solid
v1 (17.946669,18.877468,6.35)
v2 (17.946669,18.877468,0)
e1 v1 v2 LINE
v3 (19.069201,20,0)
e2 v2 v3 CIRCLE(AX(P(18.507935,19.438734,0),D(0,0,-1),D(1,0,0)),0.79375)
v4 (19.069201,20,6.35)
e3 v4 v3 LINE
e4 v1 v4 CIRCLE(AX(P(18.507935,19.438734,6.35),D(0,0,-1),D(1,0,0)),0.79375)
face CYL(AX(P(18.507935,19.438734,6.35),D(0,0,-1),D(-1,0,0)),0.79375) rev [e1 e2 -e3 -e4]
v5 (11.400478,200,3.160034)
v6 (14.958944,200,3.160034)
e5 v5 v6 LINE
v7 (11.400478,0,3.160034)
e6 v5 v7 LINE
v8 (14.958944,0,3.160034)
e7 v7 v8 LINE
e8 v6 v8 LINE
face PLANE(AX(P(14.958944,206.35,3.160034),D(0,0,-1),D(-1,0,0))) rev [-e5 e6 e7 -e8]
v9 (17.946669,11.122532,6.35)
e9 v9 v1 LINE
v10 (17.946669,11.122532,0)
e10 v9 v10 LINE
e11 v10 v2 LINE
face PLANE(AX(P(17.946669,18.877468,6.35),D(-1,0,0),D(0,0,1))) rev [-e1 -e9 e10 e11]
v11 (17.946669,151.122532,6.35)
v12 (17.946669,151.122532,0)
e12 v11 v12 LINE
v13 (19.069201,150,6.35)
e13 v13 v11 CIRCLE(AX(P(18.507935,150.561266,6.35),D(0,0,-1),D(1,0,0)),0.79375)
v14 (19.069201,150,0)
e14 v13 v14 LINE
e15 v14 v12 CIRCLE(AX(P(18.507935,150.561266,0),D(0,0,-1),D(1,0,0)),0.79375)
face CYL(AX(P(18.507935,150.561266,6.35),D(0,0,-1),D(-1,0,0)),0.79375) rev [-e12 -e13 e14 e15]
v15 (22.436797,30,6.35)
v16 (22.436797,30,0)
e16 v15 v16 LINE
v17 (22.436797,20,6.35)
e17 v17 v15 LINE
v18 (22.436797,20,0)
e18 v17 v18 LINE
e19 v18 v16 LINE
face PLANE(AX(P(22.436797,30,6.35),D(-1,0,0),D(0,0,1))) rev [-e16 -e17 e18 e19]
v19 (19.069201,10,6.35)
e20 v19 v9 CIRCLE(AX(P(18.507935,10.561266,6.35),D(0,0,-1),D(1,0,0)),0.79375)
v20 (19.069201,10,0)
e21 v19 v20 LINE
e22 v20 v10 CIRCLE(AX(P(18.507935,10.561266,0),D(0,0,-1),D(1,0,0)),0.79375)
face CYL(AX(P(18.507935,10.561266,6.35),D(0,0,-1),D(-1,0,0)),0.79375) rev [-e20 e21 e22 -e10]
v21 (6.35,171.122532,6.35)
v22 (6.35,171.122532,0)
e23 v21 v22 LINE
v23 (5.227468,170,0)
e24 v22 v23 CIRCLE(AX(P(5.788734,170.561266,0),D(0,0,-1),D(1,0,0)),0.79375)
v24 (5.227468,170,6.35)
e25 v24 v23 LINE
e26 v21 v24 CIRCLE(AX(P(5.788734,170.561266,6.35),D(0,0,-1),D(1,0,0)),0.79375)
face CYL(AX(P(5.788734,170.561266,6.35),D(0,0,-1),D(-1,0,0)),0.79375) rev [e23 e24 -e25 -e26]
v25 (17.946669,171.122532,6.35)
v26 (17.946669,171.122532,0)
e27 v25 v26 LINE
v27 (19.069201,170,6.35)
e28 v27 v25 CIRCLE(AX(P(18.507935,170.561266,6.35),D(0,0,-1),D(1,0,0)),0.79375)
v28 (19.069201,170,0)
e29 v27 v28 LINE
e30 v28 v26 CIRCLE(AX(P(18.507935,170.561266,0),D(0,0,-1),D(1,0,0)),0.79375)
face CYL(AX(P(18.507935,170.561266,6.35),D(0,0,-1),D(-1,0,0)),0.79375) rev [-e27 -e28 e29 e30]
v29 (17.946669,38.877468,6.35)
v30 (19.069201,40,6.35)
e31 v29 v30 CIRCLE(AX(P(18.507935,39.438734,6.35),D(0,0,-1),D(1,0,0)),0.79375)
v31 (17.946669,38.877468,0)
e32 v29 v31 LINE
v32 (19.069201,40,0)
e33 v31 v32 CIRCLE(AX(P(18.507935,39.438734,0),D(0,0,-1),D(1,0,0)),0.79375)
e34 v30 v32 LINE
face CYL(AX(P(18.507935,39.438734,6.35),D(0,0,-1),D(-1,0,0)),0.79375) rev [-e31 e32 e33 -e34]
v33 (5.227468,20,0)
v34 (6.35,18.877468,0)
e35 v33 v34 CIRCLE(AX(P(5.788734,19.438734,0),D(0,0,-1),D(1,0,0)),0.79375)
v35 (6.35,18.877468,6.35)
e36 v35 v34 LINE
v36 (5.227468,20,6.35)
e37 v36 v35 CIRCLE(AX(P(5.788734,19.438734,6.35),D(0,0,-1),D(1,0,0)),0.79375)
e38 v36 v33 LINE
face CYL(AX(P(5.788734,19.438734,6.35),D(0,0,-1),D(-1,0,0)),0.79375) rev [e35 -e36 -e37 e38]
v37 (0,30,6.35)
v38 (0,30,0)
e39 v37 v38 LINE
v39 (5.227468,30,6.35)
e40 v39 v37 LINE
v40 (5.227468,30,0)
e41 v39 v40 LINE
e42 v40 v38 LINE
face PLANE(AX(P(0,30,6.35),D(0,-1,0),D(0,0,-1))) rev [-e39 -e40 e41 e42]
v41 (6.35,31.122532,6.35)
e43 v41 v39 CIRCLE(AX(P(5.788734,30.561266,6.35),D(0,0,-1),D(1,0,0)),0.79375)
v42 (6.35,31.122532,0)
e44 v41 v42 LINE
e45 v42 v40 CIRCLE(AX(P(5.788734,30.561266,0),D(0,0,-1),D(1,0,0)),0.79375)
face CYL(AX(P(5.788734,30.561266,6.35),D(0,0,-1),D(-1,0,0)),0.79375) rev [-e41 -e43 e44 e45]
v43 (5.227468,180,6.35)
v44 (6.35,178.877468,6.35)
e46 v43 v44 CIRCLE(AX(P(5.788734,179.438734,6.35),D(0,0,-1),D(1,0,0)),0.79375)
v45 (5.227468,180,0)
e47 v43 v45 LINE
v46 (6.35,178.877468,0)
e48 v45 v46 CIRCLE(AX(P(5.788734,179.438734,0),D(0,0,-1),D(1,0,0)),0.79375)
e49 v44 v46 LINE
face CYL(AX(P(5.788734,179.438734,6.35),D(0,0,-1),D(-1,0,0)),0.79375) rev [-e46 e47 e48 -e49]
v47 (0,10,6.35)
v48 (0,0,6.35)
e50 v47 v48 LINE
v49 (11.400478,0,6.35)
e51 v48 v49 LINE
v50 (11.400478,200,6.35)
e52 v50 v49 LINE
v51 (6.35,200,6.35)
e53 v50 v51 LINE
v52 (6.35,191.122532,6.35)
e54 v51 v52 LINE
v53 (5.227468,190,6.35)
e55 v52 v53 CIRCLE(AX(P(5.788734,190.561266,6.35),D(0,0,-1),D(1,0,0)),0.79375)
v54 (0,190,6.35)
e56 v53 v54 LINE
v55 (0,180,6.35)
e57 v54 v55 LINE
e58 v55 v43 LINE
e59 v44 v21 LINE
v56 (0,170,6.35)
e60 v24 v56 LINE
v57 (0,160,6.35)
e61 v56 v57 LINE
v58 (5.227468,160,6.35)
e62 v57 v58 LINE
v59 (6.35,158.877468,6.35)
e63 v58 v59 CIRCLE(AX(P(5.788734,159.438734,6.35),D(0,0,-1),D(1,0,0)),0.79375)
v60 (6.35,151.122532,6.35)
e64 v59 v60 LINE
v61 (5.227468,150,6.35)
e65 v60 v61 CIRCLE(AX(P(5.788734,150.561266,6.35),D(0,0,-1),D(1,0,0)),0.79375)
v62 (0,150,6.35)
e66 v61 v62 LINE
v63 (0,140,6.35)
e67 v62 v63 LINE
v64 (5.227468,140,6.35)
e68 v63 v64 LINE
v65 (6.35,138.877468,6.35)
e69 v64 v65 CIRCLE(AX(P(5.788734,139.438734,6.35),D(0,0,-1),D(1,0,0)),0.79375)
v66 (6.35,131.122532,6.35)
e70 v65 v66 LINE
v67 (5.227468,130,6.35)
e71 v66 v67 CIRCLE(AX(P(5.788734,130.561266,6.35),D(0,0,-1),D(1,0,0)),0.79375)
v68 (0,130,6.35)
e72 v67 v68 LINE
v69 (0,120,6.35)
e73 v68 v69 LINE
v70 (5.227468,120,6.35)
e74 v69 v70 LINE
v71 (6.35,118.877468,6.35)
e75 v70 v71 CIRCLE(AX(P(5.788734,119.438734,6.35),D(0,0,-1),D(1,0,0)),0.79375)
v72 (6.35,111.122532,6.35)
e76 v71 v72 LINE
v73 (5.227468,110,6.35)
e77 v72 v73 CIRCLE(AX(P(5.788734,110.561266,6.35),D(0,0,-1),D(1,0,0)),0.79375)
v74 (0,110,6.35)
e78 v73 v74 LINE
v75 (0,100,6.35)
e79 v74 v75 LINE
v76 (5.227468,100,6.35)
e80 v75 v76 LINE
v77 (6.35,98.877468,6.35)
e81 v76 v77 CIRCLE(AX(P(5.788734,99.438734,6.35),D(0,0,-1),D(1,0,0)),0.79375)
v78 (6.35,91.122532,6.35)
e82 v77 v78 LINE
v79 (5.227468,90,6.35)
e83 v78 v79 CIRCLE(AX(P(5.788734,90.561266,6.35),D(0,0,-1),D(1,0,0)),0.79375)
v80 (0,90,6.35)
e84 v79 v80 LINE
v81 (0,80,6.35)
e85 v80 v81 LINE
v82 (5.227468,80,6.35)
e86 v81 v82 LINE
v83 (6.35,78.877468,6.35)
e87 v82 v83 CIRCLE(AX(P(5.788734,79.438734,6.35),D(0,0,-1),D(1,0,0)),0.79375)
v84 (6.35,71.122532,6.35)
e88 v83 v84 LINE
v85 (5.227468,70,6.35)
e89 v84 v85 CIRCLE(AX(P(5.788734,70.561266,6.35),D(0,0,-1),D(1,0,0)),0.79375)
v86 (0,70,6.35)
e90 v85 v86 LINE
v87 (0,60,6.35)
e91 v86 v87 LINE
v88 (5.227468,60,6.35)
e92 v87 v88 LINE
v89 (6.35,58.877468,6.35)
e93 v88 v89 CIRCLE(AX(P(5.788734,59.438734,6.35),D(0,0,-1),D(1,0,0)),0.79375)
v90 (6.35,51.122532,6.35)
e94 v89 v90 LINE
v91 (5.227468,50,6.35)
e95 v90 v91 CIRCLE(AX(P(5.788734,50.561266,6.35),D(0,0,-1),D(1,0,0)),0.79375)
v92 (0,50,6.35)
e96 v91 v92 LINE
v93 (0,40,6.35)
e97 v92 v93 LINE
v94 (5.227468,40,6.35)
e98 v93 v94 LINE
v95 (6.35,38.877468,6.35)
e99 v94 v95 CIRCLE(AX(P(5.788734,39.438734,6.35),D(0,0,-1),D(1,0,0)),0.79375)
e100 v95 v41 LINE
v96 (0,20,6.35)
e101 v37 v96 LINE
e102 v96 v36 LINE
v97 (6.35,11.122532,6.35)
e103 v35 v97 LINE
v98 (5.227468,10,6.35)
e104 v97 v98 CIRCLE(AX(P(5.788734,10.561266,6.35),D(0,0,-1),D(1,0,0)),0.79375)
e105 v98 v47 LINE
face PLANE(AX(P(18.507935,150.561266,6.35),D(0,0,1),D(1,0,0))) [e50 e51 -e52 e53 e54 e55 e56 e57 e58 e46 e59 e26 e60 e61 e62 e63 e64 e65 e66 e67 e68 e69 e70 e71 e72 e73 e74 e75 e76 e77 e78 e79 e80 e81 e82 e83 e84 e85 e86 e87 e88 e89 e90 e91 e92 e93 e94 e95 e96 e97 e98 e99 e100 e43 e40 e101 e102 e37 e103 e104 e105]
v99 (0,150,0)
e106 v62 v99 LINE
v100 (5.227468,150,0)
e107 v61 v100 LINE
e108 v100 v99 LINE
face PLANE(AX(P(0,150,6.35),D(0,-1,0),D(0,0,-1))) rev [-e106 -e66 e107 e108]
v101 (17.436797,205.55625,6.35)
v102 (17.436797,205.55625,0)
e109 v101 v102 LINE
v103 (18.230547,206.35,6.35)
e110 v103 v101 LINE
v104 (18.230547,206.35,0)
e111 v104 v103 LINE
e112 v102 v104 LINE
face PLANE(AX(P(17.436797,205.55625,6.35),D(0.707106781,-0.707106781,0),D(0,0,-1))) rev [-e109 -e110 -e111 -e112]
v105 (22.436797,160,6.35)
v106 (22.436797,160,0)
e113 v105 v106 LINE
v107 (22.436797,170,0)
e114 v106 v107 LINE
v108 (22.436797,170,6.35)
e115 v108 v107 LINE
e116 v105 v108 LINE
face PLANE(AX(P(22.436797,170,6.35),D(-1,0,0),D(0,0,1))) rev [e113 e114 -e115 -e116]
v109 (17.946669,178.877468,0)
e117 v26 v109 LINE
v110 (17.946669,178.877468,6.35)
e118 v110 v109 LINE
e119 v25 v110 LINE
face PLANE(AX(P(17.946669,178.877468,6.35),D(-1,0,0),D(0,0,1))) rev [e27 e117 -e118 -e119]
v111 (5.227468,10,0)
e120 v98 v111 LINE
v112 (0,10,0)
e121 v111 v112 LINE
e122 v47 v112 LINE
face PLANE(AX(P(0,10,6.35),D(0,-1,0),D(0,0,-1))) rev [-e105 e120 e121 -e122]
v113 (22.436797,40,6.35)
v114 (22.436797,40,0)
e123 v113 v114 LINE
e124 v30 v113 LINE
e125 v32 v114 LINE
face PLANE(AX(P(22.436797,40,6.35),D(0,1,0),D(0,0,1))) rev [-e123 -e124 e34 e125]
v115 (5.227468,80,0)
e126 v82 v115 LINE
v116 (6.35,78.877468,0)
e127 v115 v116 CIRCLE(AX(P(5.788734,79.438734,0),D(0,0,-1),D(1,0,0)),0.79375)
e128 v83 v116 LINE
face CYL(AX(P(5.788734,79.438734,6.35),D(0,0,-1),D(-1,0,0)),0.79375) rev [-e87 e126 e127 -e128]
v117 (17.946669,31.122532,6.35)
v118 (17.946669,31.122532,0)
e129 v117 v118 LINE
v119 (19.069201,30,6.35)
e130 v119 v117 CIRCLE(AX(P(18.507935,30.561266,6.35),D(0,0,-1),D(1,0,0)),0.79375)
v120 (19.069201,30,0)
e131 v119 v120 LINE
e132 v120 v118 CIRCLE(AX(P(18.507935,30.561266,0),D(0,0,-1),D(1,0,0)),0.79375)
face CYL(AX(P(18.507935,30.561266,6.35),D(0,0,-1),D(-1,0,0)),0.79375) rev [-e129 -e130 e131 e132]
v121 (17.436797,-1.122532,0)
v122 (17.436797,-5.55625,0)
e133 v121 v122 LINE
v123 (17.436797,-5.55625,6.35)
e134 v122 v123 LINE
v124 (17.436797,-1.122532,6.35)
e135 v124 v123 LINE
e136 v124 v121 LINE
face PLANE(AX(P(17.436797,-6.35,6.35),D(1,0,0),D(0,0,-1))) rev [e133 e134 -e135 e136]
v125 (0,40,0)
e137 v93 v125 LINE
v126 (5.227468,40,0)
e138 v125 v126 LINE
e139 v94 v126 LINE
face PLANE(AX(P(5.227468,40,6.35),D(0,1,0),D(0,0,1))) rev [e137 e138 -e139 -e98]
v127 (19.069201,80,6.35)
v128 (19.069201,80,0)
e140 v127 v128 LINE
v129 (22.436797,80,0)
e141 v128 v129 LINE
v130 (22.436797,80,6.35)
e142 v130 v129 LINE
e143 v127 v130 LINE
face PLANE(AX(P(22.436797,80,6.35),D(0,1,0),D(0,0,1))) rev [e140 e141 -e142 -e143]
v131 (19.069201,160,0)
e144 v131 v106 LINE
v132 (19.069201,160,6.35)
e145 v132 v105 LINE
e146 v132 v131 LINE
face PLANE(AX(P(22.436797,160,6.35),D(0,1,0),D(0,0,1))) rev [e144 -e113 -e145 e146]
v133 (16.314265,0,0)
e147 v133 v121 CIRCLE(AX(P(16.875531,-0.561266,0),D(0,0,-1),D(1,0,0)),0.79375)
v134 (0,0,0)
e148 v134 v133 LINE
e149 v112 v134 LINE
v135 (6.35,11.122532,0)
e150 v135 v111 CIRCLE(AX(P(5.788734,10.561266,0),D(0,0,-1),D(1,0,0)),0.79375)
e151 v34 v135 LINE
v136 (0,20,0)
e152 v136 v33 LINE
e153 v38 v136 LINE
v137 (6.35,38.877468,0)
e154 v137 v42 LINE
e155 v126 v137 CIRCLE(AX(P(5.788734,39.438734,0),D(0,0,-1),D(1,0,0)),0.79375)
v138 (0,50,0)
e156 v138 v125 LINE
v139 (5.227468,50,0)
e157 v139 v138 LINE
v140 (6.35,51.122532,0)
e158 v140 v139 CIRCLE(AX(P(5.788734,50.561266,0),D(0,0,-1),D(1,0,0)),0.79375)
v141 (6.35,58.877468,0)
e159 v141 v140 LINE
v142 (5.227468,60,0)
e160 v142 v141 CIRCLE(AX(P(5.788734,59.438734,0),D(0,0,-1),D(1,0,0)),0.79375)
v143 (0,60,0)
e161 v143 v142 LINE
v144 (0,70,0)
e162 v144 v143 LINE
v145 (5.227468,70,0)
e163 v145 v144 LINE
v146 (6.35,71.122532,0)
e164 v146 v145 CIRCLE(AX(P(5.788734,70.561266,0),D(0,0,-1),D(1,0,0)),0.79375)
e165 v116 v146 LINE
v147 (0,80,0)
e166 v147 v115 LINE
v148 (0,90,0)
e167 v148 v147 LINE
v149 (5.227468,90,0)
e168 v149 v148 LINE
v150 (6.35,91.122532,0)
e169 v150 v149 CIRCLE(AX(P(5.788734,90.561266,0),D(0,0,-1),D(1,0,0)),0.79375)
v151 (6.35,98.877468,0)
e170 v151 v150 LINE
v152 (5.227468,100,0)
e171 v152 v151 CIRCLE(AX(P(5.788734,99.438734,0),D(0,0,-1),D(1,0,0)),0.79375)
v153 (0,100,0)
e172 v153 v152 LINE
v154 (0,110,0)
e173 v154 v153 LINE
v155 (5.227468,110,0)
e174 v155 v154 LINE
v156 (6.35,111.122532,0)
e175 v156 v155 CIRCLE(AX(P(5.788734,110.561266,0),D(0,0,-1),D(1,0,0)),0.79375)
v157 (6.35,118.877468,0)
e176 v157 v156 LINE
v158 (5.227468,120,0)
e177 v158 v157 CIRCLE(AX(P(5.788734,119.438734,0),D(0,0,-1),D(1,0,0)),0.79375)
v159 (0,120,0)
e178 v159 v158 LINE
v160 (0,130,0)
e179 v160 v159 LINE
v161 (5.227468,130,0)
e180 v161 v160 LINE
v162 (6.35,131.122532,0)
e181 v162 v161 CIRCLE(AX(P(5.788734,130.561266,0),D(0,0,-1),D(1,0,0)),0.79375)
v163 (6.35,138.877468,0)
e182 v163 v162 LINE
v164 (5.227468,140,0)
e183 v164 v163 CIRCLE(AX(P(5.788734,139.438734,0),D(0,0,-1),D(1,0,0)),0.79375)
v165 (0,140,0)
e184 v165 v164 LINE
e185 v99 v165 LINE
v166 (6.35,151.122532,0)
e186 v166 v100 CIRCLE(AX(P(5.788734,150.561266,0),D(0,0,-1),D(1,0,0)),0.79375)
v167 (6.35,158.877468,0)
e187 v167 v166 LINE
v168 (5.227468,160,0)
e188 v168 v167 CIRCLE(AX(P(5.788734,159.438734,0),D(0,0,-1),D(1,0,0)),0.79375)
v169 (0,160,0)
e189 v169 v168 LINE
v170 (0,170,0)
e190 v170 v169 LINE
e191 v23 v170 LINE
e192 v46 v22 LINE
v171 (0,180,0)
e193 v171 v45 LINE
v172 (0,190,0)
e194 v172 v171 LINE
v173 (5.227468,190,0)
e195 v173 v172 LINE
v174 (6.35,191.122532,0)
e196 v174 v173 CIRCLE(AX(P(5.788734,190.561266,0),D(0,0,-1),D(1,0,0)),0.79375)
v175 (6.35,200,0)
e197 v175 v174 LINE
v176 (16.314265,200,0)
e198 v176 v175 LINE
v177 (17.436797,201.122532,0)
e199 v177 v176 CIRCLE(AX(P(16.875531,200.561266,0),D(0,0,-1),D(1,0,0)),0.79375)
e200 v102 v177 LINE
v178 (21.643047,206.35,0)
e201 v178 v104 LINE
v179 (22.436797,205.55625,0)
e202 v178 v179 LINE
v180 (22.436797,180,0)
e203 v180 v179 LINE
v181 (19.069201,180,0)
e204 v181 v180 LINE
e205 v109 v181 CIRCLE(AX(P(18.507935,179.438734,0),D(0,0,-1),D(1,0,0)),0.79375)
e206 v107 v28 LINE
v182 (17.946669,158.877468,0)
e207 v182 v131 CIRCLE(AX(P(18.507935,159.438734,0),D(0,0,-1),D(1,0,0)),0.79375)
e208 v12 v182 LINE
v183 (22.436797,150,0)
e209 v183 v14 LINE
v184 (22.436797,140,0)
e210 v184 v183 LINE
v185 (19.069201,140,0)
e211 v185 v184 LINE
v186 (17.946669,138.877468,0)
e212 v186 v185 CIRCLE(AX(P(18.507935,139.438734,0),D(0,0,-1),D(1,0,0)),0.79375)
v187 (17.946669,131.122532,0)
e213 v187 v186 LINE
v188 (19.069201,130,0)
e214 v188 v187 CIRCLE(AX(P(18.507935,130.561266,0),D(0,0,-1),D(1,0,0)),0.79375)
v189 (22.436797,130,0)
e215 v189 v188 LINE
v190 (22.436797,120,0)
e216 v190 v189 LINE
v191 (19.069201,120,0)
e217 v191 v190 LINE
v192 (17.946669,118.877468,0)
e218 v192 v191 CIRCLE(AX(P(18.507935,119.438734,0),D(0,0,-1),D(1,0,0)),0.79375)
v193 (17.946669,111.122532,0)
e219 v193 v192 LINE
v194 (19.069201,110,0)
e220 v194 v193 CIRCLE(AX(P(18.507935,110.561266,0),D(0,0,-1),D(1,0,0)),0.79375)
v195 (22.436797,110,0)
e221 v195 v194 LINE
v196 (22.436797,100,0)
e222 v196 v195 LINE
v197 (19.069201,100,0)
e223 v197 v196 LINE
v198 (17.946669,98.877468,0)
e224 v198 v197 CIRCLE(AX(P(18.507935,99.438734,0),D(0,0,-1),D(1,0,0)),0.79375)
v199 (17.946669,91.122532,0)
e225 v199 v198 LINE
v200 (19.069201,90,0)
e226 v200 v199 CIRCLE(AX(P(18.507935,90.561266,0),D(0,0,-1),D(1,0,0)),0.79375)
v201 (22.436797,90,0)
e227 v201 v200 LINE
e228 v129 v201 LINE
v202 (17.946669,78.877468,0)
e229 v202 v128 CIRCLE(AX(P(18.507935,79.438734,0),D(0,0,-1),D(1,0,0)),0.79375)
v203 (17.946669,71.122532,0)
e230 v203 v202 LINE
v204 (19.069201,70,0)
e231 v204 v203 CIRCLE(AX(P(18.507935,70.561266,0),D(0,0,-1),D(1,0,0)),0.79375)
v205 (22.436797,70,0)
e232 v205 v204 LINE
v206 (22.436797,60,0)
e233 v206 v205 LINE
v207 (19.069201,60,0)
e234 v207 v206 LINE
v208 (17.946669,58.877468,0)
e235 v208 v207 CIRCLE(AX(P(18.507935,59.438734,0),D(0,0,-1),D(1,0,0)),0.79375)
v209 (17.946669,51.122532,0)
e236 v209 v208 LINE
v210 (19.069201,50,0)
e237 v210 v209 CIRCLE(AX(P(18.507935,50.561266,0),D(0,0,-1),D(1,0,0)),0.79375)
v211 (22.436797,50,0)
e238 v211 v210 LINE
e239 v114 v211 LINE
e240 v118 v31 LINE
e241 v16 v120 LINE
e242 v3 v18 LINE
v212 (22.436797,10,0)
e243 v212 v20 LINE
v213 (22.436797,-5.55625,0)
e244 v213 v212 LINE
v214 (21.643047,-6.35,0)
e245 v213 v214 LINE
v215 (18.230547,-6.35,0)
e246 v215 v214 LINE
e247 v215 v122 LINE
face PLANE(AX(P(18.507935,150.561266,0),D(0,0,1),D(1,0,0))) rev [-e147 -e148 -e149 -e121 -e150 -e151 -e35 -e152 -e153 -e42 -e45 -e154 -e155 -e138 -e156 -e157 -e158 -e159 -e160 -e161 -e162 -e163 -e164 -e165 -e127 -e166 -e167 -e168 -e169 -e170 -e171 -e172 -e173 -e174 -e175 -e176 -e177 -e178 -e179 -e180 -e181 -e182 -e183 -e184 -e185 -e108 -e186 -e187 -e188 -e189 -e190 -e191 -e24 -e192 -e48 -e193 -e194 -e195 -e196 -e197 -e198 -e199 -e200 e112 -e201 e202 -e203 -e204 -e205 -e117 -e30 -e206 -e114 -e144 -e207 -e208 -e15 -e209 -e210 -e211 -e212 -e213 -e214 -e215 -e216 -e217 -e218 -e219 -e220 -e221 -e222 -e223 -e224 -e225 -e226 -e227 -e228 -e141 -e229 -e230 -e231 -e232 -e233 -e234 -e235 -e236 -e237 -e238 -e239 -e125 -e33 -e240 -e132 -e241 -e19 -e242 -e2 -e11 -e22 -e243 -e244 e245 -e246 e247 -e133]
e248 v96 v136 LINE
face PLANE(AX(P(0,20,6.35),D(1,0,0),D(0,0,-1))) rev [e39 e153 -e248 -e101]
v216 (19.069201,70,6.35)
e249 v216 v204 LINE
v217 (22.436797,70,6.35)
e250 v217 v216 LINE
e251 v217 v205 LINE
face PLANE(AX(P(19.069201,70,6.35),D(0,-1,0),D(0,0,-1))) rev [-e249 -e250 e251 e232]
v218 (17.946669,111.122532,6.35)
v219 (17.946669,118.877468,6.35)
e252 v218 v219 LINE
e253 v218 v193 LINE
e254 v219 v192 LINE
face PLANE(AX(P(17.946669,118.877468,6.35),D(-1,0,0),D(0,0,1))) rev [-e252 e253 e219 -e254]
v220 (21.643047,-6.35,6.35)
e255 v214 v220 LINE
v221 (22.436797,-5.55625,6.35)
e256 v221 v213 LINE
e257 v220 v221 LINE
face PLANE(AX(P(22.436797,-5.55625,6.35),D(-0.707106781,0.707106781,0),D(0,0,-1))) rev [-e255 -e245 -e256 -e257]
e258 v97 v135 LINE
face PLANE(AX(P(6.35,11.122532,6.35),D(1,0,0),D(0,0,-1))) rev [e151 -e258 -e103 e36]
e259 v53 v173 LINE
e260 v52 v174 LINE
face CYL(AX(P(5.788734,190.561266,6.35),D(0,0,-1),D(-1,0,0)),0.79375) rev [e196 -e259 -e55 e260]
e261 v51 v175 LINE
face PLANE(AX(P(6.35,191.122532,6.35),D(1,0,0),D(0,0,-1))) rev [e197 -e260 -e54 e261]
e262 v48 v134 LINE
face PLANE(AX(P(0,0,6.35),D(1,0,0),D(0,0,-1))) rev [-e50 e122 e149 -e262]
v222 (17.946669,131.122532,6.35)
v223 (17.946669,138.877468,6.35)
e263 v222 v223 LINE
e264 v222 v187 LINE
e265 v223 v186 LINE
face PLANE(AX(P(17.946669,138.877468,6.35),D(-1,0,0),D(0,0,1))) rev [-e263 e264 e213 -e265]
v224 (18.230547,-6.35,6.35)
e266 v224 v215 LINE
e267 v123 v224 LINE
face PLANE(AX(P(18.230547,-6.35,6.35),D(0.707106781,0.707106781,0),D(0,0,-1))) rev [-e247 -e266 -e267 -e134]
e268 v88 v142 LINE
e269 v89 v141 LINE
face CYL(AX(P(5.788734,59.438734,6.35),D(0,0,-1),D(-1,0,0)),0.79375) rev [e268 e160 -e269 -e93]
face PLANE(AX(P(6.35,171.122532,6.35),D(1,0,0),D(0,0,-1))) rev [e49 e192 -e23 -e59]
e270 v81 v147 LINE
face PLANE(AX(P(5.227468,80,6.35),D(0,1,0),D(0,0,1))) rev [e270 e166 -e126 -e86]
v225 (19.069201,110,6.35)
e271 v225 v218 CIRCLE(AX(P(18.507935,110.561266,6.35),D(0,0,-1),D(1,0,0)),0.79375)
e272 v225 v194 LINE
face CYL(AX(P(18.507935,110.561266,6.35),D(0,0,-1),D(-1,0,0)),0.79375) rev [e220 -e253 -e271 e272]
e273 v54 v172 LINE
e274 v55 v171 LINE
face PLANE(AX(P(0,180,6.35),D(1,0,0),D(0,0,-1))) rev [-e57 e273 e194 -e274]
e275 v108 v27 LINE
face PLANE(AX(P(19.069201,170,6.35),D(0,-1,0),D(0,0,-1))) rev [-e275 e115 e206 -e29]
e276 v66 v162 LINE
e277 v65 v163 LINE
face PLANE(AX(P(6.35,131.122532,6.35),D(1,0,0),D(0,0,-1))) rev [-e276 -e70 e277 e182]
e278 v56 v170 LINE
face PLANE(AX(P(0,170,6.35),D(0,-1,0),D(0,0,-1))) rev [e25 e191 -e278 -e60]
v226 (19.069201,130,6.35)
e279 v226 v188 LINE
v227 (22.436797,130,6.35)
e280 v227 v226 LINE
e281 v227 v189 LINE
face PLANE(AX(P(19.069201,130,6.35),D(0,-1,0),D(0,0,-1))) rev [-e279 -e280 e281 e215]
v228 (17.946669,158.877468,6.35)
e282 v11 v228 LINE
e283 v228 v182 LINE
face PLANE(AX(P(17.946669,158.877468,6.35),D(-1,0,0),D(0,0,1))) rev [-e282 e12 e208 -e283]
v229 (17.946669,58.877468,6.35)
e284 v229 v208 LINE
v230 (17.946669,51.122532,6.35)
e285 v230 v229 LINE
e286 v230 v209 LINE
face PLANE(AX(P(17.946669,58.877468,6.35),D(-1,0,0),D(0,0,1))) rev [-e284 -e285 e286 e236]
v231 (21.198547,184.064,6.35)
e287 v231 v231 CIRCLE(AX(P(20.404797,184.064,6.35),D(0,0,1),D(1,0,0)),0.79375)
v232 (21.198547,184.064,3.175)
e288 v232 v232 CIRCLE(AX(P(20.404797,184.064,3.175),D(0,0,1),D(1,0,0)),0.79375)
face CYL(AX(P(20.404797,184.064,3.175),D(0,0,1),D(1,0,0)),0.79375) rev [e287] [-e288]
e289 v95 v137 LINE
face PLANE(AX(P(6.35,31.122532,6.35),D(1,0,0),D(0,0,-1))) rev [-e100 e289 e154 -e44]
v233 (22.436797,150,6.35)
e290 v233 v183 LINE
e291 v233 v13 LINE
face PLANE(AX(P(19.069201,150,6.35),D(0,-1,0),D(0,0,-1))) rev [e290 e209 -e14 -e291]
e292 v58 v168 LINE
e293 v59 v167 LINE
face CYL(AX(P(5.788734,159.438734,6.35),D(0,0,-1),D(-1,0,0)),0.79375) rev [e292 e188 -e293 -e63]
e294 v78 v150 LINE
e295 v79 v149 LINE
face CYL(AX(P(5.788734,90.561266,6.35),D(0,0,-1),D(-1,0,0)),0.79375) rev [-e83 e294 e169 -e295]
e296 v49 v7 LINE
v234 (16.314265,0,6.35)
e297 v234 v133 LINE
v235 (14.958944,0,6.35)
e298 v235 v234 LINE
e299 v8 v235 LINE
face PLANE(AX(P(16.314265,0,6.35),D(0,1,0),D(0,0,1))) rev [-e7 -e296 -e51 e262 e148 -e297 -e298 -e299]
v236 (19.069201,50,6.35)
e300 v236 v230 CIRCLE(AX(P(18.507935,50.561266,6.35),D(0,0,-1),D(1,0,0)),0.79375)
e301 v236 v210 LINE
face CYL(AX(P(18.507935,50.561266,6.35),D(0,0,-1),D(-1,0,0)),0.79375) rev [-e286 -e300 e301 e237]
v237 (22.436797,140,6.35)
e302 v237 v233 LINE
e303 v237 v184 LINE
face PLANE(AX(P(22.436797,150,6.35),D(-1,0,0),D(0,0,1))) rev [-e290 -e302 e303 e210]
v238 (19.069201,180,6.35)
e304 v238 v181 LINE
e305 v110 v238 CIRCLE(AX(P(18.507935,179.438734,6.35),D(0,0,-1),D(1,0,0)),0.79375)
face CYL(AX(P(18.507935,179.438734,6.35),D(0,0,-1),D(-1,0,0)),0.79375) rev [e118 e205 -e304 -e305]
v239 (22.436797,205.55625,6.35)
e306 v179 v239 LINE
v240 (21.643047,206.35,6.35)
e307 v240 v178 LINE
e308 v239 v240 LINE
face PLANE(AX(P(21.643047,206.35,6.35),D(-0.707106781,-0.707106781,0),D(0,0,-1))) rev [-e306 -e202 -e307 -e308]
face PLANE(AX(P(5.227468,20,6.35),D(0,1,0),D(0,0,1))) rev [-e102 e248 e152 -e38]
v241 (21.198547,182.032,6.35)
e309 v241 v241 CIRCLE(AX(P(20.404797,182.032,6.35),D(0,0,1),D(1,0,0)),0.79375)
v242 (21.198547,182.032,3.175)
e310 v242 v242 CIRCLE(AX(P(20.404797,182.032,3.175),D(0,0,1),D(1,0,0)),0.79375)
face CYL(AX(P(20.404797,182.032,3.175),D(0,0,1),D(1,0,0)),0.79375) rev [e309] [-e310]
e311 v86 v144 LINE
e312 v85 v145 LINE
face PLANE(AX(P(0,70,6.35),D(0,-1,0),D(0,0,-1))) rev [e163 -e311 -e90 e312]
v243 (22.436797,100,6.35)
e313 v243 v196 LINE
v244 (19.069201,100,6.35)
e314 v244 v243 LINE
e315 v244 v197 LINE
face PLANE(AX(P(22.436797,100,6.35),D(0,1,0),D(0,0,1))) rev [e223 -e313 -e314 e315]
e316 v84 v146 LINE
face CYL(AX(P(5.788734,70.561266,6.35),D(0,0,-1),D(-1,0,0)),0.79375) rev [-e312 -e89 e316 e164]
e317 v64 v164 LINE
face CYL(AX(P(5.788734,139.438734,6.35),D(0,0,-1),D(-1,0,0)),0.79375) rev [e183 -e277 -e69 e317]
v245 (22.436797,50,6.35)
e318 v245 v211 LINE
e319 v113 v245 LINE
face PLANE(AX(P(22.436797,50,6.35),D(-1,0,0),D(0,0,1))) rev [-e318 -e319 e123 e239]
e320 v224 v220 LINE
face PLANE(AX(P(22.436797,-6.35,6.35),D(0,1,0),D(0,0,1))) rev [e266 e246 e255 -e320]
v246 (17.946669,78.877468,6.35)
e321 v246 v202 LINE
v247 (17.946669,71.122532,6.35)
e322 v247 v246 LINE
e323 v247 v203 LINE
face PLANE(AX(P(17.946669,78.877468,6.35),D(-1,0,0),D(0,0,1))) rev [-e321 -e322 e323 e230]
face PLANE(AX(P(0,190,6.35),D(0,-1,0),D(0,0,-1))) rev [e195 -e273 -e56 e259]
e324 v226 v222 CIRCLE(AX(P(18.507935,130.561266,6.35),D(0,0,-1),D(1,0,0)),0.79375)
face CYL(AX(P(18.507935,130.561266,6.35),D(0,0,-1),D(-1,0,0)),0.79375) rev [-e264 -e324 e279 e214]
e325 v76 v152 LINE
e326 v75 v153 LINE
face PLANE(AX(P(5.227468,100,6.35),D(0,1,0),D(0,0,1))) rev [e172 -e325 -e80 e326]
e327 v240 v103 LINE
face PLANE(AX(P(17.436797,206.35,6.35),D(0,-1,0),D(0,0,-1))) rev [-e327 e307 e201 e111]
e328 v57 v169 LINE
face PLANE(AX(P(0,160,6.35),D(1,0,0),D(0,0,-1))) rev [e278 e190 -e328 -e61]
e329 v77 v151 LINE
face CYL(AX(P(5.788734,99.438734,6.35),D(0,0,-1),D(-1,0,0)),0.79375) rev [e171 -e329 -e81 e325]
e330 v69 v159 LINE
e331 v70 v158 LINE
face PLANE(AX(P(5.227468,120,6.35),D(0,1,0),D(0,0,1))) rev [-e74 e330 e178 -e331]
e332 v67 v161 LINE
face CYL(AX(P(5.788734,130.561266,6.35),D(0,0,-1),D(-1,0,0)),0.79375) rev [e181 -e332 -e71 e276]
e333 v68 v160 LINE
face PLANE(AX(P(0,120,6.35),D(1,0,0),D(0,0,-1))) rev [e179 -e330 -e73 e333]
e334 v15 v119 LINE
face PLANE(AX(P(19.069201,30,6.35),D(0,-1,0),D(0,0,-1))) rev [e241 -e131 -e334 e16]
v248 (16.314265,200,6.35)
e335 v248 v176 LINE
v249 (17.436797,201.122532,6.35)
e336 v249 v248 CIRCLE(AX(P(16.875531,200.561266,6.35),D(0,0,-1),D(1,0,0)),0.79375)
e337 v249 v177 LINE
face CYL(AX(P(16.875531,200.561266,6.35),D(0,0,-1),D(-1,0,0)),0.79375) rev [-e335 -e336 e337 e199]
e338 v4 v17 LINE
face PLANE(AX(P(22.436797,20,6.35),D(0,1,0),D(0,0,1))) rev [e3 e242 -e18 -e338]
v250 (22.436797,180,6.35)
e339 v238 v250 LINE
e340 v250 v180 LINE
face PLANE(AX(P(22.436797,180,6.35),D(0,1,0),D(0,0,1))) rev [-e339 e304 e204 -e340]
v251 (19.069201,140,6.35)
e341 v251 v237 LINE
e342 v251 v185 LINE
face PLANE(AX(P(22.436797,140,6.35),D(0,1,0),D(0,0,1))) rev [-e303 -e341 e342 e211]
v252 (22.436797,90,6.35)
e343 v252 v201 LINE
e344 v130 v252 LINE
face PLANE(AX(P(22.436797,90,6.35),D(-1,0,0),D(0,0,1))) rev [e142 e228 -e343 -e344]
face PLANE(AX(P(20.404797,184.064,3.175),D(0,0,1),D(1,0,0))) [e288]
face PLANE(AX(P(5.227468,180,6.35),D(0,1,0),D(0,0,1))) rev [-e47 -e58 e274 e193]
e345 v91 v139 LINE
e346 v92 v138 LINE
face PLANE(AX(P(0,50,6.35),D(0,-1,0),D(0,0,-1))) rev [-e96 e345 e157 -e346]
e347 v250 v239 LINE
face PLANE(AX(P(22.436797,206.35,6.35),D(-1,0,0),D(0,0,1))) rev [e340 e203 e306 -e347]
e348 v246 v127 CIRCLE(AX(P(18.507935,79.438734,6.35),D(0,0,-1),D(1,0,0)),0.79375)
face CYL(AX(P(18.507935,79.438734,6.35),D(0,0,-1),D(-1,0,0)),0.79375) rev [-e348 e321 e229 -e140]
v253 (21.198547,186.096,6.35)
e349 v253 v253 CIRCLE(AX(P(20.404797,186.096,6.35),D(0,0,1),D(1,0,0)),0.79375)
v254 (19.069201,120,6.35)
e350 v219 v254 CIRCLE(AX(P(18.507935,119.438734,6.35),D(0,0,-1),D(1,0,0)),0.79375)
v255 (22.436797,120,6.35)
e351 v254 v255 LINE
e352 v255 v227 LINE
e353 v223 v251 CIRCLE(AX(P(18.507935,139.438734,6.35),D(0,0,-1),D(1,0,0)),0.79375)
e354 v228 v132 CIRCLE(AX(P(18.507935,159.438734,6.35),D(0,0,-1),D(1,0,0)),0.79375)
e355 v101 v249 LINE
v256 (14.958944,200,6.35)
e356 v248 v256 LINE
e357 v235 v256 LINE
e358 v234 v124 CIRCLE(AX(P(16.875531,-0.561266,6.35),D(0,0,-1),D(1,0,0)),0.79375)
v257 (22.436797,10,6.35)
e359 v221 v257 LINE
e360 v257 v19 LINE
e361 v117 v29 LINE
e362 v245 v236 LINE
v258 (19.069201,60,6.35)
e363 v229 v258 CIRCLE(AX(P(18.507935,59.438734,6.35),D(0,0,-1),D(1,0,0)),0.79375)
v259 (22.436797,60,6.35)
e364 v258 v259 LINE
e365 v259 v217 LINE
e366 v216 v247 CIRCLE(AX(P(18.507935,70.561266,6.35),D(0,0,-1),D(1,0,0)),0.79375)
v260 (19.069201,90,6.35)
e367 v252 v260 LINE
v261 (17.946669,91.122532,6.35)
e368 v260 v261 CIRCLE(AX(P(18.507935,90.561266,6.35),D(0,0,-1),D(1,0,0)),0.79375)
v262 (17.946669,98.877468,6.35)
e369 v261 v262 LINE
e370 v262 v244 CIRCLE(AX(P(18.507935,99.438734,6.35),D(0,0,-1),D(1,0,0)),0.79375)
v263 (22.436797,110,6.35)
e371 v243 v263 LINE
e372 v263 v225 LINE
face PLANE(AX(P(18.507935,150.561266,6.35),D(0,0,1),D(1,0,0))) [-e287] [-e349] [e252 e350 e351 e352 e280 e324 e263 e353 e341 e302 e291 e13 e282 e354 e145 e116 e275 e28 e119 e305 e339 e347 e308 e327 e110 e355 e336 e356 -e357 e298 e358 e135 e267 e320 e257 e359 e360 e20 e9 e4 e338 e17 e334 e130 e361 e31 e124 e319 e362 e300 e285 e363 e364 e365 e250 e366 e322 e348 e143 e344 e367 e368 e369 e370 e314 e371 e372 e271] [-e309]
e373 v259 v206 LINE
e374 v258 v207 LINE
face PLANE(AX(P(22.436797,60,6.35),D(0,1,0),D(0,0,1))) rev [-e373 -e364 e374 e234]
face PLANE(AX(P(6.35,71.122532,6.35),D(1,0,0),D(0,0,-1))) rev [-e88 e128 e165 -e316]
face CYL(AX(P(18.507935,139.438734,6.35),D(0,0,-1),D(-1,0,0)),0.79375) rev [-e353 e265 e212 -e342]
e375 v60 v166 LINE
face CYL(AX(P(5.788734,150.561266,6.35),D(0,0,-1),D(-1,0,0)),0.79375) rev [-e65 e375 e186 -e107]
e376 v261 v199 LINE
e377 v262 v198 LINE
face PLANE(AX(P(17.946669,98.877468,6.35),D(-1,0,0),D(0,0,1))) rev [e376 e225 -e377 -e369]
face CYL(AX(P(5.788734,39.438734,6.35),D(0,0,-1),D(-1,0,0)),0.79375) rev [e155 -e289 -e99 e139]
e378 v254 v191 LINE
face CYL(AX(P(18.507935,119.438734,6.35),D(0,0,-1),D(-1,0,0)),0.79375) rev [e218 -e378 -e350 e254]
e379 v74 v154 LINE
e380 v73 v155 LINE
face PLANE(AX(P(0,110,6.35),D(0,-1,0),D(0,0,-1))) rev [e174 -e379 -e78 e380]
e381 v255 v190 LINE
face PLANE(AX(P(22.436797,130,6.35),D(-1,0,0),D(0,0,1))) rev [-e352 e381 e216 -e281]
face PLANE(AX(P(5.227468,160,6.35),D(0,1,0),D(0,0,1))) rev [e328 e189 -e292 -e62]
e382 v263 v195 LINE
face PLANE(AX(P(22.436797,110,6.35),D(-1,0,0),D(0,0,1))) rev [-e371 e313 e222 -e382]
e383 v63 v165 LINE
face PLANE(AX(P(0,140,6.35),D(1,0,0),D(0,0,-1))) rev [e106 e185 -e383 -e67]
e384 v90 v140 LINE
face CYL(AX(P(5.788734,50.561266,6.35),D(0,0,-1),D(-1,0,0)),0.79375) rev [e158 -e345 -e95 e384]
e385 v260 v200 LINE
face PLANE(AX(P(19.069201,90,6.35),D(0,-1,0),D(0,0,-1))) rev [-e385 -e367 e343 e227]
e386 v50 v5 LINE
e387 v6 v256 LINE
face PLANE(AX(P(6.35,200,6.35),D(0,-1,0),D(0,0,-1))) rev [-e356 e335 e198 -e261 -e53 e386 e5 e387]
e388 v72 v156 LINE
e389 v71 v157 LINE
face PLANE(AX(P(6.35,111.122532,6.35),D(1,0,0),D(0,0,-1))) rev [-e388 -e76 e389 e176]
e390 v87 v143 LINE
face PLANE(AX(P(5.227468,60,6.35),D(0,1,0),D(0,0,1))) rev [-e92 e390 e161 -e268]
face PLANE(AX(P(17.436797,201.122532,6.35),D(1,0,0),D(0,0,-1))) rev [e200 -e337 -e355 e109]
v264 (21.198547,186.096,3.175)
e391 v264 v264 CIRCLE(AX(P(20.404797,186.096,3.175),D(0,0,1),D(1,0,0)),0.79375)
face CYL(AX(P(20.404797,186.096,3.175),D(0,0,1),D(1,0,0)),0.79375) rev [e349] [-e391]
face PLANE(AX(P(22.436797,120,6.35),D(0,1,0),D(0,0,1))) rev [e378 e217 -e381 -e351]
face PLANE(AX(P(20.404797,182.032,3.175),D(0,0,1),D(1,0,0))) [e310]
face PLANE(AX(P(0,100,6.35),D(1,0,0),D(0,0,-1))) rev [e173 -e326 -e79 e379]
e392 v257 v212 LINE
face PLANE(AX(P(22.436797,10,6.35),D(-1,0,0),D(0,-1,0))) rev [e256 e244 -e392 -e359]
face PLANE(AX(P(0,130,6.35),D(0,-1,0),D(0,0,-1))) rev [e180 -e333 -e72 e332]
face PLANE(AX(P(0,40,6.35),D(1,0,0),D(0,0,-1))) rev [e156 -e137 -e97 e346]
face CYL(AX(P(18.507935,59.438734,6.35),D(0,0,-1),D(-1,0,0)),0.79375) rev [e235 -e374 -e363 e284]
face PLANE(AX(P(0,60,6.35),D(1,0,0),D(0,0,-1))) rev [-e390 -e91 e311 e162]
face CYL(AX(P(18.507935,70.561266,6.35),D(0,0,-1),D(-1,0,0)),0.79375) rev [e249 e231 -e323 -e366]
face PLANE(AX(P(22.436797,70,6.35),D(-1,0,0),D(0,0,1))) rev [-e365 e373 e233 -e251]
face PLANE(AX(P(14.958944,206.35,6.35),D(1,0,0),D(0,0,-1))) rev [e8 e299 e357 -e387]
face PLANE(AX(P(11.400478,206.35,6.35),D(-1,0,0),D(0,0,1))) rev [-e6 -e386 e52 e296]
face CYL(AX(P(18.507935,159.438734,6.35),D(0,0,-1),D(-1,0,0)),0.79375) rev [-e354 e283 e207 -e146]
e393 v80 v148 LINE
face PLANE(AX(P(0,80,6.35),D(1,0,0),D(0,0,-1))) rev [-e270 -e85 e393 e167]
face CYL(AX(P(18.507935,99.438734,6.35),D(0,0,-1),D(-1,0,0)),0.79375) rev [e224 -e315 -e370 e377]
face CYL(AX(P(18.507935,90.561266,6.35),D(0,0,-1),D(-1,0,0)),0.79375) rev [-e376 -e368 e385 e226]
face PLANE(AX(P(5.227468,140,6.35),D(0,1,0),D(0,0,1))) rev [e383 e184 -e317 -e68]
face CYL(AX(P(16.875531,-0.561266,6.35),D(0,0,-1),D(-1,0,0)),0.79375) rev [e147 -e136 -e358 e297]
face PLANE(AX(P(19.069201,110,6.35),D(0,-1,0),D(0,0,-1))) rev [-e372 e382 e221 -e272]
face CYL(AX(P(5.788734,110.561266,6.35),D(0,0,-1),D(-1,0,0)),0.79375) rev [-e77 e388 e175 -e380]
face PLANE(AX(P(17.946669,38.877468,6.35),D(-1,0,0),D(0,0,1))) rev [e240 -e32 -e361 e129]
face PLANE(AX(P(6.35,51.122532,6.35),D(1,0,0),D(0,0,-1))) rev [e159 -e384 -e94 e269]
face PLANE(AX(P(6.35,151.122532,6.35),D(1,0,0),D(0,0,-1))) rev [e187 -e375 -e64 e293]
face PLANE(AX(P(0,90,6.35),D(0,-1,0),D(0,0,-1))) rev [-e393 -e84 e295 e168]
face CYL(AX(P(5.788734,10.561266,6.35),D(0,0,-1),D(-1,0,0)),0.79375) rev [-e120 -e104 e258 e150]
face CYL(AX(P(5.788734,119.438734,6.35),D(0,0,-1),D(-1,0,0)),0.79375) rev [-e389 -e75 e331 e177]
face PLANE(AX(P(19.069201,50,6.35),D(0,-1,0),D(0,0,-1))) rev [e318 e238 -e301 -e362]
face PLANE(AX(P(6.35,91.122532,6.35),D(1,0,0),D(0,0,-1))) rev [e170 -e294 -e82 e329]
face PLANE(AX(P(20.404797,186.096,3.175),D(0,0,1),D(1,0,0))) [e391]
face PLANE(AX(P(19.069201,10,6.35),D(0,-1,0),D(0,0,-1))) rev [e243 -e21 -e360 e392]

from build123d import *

# Parameters (mm, degrees)
BOSS_EXTRUDE1_DEPTH = 6.35
CHAMFER1_SIZE       = 0.79375
SKETCH16_W          = 3.558466008
SKETCH16_H          = 3.18996611
CUT_EXTRUDE14_DEPTH = 208.663320883
SKETCH21_R          = 0.79375
CUT_EXTRUDE16_DEPTH = 3.175
LPATTERN3_COUNT     = 3
LPATTERN3_PITCH     = 2.032


# Read off the part's stored shape, not the designer's step: Boss-Extrude1
with BuildPart() as part:
    # Boss-Extrude1 outline → Boss-Extrude1 (new body)
    with BuildSketch(Plane.XY):
        with BuildLine():
            Line((22.436796564, 150), (19.069200519, 150))
            ThreePointArc((19.069200519, 150), (17.946668504, 150), (17.946668504, 151.122532015))
            Line((17.946668504, 151.122532015), (17.946668504, 158.877467985))
            ThreePointArc((17.946668504, 158.877467985), (17.946668504, 160), (19.069200519, 160))
            Line((19.069200519, 160), (22.436796564, 160))
            Line((22.436796564, 160), (22.436796564, 170))
            Line((22.436796564, 170), (19.069200519, 170))
            ThreePointArc((19.069200519, 170), (17.946668504, 170), (17.946668504, 171.122532015))
            Line((17.946668504, 171.122532015), (17.946668504, 178.877467985))
            ThreePointArc((17.946668504, 178.877467985), (17.946668504, 180), (19.069200519, 180))
            Line((19.069200519, 180), (22.436796564, 180))
            Line((22.436796564, 180), (22.436796564, 206.35))
            Line((22.436796564, 206.35), (17.436796564, 206.35))
            Line((17.436796564, 206.35), (17.436796564, 201.122532015))
            ThreePointArc((17.436796564, 201.122532015), (17.436796564, 200), (16.314264549, 200))
            Line((16.314264549, 200), (6.35, 200))
            Line((6.35, 200), (6.35, 191.122532015))
            ThreePointArc((6.35, 191.122532015), (6.35, 190), (5.227467985, 190))
            Line((5.227467985, 190), (0, 190))
            Line((0, 190), (0, 180))
            Line((0, 180), (5.227467985, 180))
            ThreePointArc((5.227467985, 180), (6.35, 180), (6.35, 178.877467985))
            Line((6.35, 178.877467985), (6.35, 171.122532015))
            ThreePointArc((6.35, 171.122532015), (6.35, 170), (5.227467985, 170))
            Line((5.227467985, 170), (0, 170))
            Line((0, 170), (0, 160))
            Line((0, 160), (5.227467985, 160))
            ThreePointArc((5.227467985, 160), (6.35, 160), (6.35, 158.877467985))
            Line((6.35, 158.877467985), (6.35, 151.122532015))
            ThreePointArc((6.35, 151.122532015), (6.35, 150), (5.227467985, 150))
            Line((5.227467985, 150), (0, 150))
            Line((0, 150), (0, 140))
            Line((0, 140), (5.227467985, 140))
            ThreePointArc((5.227467985, 140), (6.35, 140), (6.35, 138.877467985))
            Line((6.35, 138.877467985), (6.35, 131.122532015))
            ThreePointArc((6.35, 131.122532015), (6.35, 130), (5.227467985, 130))
            Line((5.227467985, 130), (0, 130))
            Line((0, 130), (0, 120))
            Line((0, 120), (5.227467985, 120))
            ThreePointArc((5.227467985, 120), (6.35, 120), (6.35, 118.877467985))
            Line((6.35, 118.877467985), (6.35, 111.122532015))
            ThreePointArc((6.35, 111.122532015), (6.35, 110), (5.227467985, 110))
            Line((5.227467985, 110), (0, 110))
            Line((0, 110), (0, 100))
            Line((0, 100), (5.227467985, 100))
            ThreePointArc((5.227467985, 100), (6.35, 100), (6.35, 98.877467985))
            Line((6.35, 98.877467985), (6.35, 91.122532015))
            ThreePointArc((6.35, 91.122532015), (6.35, 90), (5.227467985, 90))
            Line((5.227467985, 90), (0, 90))
            Line((0, 90), (0, 80))
            Line((0, 80), (5.227467985, 80))
            ThreePointArc((5.227467985, 80), (6.35, 80), (6.35, 78.877467985))
            Line((6.35, 78.877467985), (6.35, 71.122532015))
            ThreePointArc((6.35, 71.122532015), (6.35, 70), (5.227467985, 70))
            Line((5.227467985, 70), (0, 70))
            Line((0, 70), (0, 60))
            Line((0, 60), (5.227467985, 60))
            ThreePointArc((5.227467985, 60), (6.35, 60), (6.35, 58.877467985))
            Line((6.35, 58.877467985), (6.35, 51.122532015))
            ThreePointArc((6.35, 51.122532015), (6.35, 50), (5.227467985, 50))
            Line((5.227467985, 50), (0, 50))
            Line((0, 50), (0, 40))
            Line((0, 40), (5.227467985, 40))
            ThreePointArc((5.227467985, 40), (6.35, 40), (6.35, 38.877467985))
            Line((6.35, 38.877467985), (6.35, 31.122532015))
            ThreePointArc((6.35, 31.122532015), (6.35, 30), (5.227467985, 30))
            Line((5.227467985, 30), (0, 30))
            Line((0, 30), (0, 20))
            Line((0, 20), (5.227467985, 20))
            ThreePointArc((5.227467985, 20), (6.35, 20), (6.35, 18.877467985))
            Line((6.35, 18.877467985), (6.35, 11.122532015))
            ThreePointArc((6.35, 11.122532015), (6.35, 10), (5.227467985, 10))
            Line((5.227467985, 10), (0, 10))
            Line((0, 10), (0, 0))
            Line((0, 0), (16.314264549, 0))
            ThreePointArc((16.314264549, 0), (17.436796564, 0), (17.436796564, -1.122532015))
            Line((17.436796564, -1.122532015), (17.436796564, -6.35))
            Line((17.436796564, -6.35), (22.436796564, -6.35))
            Line((22.436796564, -6.35), (22.436796564, 10))
            Line((22.436796564, 10), (19.069200519, 10))
            ThreePointArc((19.069200519, 10), (17.946668504, 10), (17.946668504, 11.122532015))
            Line((17.946668504, 11.122532015), (17.946668504, 18.877467985))
            ThreePointArc((17.946668504, 18.877467985), (17.946668504, 20), (19.069200519, 20))
            Line((19.069200519, 20), (22.436796564, 20))
            Line((22.436796564, 20), (22.436796564, 30))
            Line((22.436796564, 30), (19.069200519, 30))
            ThreePointArc((19.069200519, 30), (17.946668504, 30), (17.946668504, 31.122532015))
            Line((17.946668504, 31.122532015), (17.946668504, 38.877467985))
            ThreePointArc((17.946668504, 38.877467985), (17.946668504, 40), (19.069200519, 40))
            Line((19.069200519, 40), (22.436796564, 40))
            Line((22.436796564, 40), (22.436796564, 50))
            Line((22.436796564, 50), (19.069200519, 50))
            ThreePointArc((19.069200519, 50), (17.946668504, 50), (17.946668504, 51.122532015))
            Line((17.946668504, 51.122532015), (17.946668504, 58.877467985))
            ThreePointArc((17.946668504, 58.877467985), (17.946668504, 60), (19.069200519, 60))
            Line((19.069200519, 60), (22.436796564, 60))
            Line((22.436796564, 60), (22.436796564, 70))
            Line((22.436796564, 70), (19.069200519, 70))
            ThreePointArc((19.069200519, 70), (17.946668504, 70), (17.946668504, 71.122532015))
            Line((17.946668504, 71.122532015), (17.946668504, 78.877467985))
            ThreePointArc((17.946668504, 78.877467985), (17.946668504, 80), (19.069200519, 80))
            Line((19.069200519, 80), (22.436796564, 80))
            Line((22.436796564, 80), (22.436796564, 90))
            Line((22.436796564, 90), (19.069200519, 90))
            ThreePointArc((19.069200519, 90), (17.946668504, 90), (17.946668504, 91.122532015))
            Line((17.946668504, 91.122532015), (17.946668504, 98.877467985))
            ThreePointArc((17.946668504, 98.877467985), (17.946668504, 100), (19.069200519, 100))
            Line((19.069200519, 100), (22.436796564, 100))
            Line((22.436796564, 100), (22.436796564, 110))
            Line((22.436796564, 110), (19.069200519, 110))
            ThreePointArc((19.069200519, 110), (17.946668504, 110), (17.946668504, 111.122532015))
            Line((17.946668504, 111.122532015), (17.946668504, 118.877467985))
            ThreePointArc((17.946668504, 118.877467985), (17.946668504, 120), (19.069200519, 120))
            Line((19.069200519, 120), (22.436796564, 120))
            Line((22.436796564, 120), (22.436796564, 130))
            Line((22.436796564, 130), (19.069200519, 130))
            ThreePointArc((19.069200519, 130), (17.946668504, 130), (17.946668504, 131.122532015))
            Line((17.946668504, 131.122532015), (17.946668504, 138.877467985))
            ThreePointArc((17.946668504, 138.877467985), (17.946668504, 140), (19.069200519, 140))
            Line((19.069200519, 140), (22.436796564, 140))
            Line((22.436796564, 140), (22.436796564, 150))
        make_face()
    extrude(amount=BOSS_EXTRUDE1_DEPTH)

    # Chamfer1
    chamfer1_edges = [part.edges().sort_by_distance(p)[0] for p in [
        (22.436796564, -6.35, 3.175),
        (17.436796564, -6.35, 3.175),
        (17.436796564, 206.35, 3.175),
        (22.436796564, 206.35, 3.175),
    ]]
    chamfer(chamfer1_edges, length=CHAMFER1_SIZE)

    # Sketch16 → Cut-Extrude14 (cut, through all)
    with BuildSketch(Plane.XZ):
        with Locations((13.17971111, 4.755016945)):
            Rectangle(SKETCH16_W, SKETCH16_H)
    extrude(amount=-CUT_EXTRUDE14_DEPTH, mode=Mode.SUBTRACT)

    # Sketch21 → Cut-Extrude16 (cut)
    with BuildSketch(Plane.XY.offset(6.35)):
        with Locations((20.404796564, 182.032)):
            Circle(SKETCH21_R)
    cut_extrude16 = extrude(amount=-CUT_EXTRUDE16_DEPTH, mode=Mode.SUBTRACT)

    # LPattern3: Cut-Extrude16 ×3
    with Locations(*[(0, i * LPATTERN3_PITCH, 0) for i in range(1, LPATTERN3_COUNT)]):
        add(cut_extrude16, mode=Mode.SUBTRACT)


solid = part.part
